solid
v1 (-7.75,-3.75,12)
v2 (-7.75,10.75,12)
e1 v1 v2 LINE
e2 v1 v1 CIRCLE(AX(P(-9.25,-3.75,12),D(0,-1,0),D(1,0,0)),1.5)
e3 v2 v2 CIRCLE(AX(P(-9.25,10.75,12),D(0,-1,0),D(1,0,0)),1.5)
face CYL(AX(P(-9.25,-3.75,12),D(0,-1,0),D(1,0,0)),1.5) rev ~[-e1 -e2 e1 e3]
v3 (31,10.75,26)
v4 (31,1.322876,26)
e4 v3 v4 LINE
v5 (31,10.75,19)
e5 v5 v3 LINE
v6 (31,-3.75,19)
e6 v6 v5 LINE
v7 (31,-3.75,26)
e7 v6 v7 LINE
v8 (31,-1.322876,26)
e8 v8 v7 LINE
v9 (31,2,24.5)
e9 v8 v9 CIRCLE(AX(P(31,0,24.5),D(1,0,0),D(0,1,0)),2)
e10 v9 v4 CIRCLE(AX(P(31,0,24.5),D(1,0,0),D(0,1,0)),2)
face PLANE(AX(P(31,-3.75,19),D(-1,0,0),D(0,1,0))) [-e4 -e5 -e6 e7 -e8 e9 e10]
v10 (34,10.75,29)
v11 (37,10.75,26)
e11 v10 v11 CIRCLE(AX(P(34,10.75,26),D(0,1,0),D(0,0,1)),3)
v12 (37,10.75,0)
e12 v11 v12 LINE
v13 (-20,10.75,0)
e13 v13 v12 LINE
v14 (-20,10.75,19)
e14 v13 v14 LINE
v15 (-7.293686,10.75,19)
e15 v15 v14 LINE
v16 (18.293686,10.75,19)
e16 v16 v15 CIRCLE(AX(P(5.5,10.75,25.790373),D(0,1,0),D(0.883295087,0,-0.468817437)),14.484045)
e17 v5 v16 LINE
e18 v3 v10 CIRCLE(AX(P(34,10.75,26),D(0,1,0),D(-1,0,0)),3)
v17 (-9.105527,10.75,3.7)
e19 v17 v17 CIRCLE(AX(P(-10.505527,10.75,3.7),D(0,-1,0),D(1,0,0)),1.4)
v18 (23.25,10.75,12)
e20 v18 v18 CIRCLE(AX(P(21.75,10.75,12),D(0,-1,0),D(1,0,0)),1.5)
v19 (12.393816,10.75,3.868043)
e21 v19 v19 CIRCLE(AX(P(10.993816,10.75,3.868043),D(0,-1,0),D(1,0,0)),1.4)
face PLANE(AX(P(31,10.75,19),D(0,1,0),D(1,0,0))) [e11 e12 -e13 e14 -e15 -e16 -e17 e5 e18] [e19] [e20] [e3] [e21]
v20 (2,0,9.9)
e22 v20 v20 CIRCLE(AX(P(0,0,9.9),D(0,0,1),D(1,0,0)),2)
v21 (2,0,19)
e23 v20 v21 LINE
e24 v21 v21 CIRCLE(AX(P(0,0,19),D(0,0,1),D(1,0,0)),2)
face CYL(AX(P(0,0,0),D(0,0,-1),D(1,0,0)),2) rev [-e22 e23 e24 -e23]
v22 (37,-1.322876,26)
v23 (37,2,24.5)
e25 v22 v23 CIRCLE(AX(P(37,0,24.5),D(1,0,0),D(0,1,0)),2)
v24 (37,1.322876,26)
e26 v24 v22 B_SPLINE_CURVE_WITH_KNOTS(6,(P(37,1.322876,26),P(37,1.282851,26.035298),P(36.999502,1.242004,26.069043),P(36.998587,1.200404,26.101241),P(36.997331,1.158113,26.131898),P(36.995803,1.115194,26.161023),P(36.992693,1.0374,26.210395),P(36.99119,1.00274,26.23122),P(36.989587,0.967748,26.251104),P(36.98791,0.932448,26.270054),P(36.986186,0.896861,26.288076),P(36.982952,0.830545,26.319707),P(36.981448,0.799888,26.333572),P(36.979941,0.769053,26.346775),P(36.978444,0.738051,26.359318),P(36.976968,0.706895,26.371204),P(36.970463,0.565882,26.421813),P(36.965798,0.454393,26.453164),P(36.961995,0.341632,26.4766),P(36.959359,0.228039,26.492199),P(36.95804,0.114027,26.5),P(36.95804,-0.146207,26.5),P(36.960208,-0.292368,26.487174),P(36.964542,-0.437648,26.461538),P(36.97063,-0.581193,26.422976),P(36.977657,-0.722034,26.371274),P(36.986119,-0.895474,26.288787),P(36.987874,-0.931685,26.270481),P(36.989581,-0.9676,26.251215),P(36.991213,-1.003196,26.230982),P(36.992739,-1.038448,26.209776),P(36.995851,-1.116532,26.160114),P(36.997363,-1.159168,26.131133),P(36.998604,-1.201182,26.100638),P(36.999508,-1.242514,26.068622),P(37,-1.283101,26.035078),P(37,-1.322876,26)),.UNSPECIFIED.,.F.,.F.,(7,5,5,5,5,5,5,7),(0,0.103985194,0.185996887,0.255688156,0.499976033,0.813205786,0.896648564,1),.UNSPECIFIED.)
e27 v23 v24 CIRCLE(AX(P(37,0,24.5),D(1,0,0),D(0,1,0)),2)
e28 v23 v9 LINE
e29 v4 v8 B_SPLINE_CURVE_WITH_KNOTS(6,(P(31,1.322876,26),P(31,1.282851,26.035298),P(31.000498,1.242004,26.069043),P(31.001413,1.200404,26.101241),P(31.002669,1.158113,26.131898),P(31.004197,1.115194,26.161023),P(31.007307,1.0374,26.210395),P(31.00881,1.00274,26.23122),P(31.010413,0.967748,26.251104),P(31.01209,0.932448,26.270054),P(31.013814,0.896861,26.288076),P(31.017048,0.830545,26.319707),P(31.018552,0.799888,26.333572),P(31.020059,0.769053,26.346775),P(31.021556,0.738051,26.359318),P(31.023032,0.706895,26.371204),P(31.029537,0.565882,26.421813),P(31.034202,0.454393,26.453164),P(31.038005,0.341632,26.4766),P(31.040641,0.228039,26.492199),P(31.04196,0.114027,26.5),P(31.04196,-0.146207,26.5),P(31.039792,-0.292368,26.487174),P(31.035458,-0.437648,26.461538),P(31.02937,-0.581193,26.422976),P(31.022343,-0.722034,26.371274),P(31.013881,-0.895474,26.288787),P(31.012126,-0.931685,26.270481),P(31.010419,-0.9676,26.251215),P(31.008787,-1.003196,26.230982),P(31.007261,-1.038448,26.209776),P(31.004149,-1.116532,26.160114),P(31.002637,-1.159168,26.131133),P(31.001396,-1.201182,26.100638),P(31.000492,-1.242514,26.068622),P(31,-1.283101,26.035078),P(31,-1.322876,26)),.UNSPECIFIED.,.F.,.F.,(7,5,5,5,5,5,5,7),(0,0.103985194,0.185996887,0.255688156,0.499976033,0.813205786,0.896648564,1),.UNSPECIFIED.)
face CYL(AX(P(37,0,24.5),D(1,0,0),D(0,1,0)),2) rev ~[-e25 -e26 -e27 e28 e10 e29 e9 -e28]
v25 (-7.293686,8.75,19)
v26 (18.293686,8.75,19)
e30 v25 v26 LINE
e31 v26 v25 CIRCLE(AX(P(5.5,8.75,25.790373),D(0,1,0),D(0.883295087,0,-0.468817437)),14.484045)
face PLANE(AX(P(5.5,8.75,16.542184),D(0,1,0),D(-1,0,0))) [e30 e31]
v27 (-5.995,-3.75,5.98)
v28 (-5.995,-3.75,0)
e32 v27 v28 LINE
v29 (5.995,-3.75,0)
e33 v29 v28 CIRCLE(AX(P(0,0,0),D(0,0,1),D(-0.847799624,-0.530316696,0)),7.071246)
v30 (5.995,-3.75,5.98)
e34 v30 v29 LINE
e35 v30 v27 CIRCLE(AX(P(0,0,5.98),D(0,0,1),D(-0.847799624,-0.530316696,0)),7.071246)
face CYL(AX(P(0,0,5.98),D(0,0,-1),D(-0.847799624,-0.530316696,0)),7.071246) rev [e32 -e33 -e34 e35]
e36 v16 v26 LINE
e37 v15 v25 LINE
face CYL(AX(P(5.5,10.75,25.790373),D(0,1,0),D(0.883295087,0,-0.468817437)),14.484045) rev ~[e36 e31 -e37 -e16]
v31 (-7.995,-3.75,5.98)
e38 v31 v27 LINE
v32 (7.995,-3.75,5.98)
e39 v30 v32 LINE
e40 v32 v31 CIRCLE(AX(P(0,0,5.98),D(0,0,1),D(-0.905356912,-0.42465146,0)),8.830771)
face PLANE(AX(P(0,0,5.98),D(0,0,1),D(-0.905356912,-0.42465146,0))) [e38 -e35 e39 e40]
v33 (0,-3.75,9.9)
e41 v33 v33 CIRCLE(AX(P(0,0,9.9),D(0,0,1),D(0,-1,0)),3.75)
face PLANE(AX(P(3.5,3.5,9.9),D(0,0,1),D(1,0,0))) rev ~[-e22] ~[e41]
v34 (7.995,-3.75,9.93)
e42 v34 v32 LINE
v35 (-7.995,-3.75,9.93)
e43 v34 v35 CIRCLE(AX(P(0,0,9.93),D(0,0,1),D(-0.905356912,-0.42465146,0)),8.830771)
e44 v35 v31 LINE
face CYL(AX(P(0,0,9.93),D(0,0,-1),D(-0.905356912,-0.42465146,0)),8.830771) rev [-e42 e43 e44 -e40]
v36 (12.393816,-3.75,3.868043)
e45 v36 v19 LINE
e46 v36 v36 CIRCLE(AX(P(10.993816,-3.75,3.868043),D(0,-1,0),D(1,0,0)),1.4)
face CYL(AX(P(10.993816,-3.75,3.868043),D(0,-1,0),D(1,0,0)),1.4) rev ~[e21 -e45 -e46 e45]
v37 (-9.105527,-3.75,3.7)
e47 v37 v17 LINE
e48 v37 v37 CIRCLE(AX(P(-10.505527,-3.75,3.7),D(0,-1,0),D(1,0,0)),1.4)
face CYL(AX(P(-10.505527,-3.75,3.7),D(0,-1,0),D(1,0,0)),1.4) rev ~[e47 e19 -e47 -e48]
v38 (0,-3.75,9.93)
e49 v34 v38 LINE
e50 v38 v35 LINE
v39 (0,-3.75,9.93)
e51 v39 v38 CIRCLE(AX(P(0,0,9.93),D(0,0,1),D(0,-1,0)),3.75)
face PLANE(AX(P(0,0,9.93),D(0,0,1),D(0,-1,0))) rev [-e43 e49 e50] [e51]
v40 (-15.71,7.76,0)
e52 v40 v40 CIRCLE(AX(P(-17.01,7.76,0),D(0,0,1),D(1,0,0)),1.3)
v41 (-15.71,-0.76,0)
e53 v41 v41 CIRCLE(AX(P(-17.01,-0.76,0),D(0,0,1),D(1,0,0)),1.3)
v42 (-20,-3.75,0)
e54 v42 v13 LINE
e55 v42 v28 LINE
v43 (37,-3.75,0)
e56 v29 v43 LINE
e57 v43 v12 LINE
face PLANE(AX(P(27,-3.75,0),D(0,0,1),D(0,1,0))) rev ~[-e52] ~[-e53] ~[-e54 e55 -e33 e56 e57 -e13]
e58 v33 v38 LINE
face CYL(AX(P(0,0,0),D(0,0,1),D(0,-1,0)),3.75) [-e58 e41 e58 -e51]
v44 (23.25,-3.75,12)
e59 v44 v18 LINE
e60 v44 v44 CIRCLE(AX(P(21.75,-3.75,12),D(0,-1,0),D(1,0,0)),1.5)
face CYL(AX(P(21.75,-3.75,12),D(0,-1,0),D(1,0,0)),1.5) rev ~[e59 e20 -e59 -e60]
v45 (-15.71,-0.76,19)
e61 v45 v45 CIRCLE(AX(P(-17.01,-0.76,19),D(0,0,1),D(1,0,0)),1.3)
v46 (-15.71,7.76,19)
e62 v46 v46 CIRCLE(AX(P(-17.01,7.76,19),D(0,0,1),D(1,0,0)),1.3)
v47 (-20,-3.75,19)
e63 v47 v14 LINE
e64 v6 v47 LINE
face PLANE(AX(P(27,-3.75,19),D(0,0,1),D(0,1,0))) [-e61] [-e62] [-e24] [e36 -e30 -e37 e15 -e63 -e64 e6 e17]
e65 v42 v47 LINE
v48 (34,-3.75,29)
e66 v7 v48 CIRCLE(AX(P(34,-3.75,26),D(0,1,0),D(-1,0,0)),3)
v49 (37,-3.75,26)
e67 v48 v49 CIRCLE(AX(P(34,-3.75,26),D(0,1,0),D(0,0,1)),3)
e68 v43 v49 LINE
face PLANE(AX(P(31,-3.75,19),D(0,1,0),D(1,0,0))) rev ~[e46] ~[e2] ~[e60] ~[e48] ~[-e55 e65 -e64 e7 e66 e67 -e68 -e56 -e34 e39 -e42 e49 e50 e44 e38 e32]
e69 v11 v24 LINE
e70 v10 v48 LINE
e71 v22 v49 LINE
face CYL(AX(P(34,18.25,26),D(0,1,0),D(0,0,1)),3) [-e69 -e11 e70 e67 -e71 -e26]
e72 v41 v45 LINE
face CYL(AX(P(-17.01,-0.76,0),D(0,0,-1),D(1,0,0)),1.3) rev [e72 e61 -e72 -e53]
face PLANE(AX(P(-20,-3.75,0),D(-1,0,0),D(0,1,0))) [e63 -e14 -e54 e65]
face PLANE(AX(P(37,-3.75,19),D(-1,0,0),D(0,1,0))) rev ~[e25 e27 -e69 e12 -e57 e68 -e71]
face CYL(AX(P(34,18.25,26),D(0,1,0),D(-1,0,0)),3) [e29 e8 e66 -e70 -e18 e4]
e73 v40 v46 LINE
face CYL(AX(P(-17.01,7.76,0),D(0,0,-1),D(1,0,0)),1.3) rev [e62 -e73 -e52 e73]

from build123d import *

# Parameters (mm, degrees)
F0_W         = 47
F0_H         = 14.5
F0_R         = 1.3
F0_R_2       = 2
F1_DEPTH     = 19
F4_DEPTH     = 9.9
F5_R         = 1.5
F5_R_2       = 1.4
F6_DEPTH     = 14.5
F7_DEPTH     = 10
F8_W         = 6
F8_H         = 14.5
F9_DEPTH     = 10
F10_R        = 2
F11_DEPTH    = 6
F12_T1_DEPTH = 29.5
F14_DEPTH    = 2


# Not quite as in the source:
# - a fillet or chamfer that OpenCascade refuses, or shapes differently, is made with other operations: its cross-section is extruded or revolved along the edge and cut away or added


with BuildPart() as f1:
    # F0 (on Top) → F1 (new body)
    with BuildSketch(Plane.XY):
        with Locations((3.5, 3.5)):
            Rectangle(F0_W, F0_H)
        with Locations((-17.01, -0.76)):
            Circle(F0_R, mode=Mode.SUBTRACT)
        Circle(F0_R_2, mode=Mode.SUBTRACT)
        with Locations((-17.01, 7.76)):
            Circle(F0_R, mode=Mode.SUBTRACT)
    extrude(amount=F1_DEPTH)

    # F2 (on face) → F3 (revolve, cut)
    with BuildSketch(Plane.XZ.offset(3.75)):
        Polygon((0, 9.93), (-7.995, 9.93), (-7.995, 5.98), (-5.995, 5.98), (-5.995, 0), (0, 0), align=None)
    revolve(axis=Axis((0, 0, 0), (0, 0, 1)), mode=Mode.SUBTRACT)

    # F4 (cut): a face of the model
    f4_faces = [f1.faces().sort_by_distance(p)[0] for p in [
        (0, 3.6439339828, 0),
    ]]
    extrude(f4_faces, amount=-F4_DEPTH, mode=Mode.SUBTRACT)

    # F5 (on face) → F6 (cut, through all)
    with BuildSketch(Plane.XZ.offset(3.75)):
        with Locations((-9.25, 12)):
            Circle(F5_R)
        with Locations((-10.5055273842, 3.7)):
            Circle(F5_R_2)
        with Locations((10.9938158954, 3.8680432901)):
            Circle(F5_R_2)
        with Locations((21.75, 12)):
            Circle(F5_R)
    extrude(amount=-F6_DEPTH, mode=Mode.SUBTRACT)

    # F7 (add): a face of the model
    f7_faces = [f1.faces().sort_by_distance(p)[0] for p in [
        (27, 3.5, 9.5),
    ]]
    extrude(f7_faces, amount=F7_DEPTH)

    # F8 (on face) → F9 (join)
    with BuildSketch(Plane.XY.offset(19)):
        with Locations((34, 3.5)):
            Rectangle(F8_W, F8_H)
    extrude(amount=F9_DEPTH)

    # F10 (on face) → F11 (cut, through all)
    with BuildSketch(Plane.YZ.offset(37)):
        with Locations((0, 24.5)):
            Circle(F10_R)
    extrude(amount=-F11_DEPTH, mode=Mode.SUBTRACT)

    # F12: fillet of radius 3 on 2 edges, made by hand

    # F12_s2 → F12_t1 (cut)
    with BuildSketch(Plane.XZ.offset(-18.25)):
        with BuildLine():
            ThreePointArc((31, 26), (31.8786796564, 28.1213203436), (34, 29))
            Line((34, 29), (31, 29))
            Line((31, 29), (31, 26))
        make_face()
        with BuildLine():
            ThreePointArc((34, 29), (36.1213203436, 28.1213203436), (37, 26))
            Line((37, 26), (37, 29))
            Line((37, 29), (34, 29))
        make_face()
    extrude(amount=F12_T1_DEPTH, mode=Mode.SUBTRACT)

    # F13 (on face) → F14 (cut)
    with BuildSketch(Plane(origin=(0, 10.75, 0), x_dir=(-1, 0, 0), z_dir=(0, 1, 0))):
        with BuildLine():
            Line((7.2936857888, 19), (-18.2936857888, 19))
            ThreePointArc((-18.2936857888, 19), (-5.5, 11.3063278591), (7.2936857888, 19))
        make_face()
    extrude(amount=-F14_DEPTH, mode=Mode.SUBTRACT)


solid = f1.part
